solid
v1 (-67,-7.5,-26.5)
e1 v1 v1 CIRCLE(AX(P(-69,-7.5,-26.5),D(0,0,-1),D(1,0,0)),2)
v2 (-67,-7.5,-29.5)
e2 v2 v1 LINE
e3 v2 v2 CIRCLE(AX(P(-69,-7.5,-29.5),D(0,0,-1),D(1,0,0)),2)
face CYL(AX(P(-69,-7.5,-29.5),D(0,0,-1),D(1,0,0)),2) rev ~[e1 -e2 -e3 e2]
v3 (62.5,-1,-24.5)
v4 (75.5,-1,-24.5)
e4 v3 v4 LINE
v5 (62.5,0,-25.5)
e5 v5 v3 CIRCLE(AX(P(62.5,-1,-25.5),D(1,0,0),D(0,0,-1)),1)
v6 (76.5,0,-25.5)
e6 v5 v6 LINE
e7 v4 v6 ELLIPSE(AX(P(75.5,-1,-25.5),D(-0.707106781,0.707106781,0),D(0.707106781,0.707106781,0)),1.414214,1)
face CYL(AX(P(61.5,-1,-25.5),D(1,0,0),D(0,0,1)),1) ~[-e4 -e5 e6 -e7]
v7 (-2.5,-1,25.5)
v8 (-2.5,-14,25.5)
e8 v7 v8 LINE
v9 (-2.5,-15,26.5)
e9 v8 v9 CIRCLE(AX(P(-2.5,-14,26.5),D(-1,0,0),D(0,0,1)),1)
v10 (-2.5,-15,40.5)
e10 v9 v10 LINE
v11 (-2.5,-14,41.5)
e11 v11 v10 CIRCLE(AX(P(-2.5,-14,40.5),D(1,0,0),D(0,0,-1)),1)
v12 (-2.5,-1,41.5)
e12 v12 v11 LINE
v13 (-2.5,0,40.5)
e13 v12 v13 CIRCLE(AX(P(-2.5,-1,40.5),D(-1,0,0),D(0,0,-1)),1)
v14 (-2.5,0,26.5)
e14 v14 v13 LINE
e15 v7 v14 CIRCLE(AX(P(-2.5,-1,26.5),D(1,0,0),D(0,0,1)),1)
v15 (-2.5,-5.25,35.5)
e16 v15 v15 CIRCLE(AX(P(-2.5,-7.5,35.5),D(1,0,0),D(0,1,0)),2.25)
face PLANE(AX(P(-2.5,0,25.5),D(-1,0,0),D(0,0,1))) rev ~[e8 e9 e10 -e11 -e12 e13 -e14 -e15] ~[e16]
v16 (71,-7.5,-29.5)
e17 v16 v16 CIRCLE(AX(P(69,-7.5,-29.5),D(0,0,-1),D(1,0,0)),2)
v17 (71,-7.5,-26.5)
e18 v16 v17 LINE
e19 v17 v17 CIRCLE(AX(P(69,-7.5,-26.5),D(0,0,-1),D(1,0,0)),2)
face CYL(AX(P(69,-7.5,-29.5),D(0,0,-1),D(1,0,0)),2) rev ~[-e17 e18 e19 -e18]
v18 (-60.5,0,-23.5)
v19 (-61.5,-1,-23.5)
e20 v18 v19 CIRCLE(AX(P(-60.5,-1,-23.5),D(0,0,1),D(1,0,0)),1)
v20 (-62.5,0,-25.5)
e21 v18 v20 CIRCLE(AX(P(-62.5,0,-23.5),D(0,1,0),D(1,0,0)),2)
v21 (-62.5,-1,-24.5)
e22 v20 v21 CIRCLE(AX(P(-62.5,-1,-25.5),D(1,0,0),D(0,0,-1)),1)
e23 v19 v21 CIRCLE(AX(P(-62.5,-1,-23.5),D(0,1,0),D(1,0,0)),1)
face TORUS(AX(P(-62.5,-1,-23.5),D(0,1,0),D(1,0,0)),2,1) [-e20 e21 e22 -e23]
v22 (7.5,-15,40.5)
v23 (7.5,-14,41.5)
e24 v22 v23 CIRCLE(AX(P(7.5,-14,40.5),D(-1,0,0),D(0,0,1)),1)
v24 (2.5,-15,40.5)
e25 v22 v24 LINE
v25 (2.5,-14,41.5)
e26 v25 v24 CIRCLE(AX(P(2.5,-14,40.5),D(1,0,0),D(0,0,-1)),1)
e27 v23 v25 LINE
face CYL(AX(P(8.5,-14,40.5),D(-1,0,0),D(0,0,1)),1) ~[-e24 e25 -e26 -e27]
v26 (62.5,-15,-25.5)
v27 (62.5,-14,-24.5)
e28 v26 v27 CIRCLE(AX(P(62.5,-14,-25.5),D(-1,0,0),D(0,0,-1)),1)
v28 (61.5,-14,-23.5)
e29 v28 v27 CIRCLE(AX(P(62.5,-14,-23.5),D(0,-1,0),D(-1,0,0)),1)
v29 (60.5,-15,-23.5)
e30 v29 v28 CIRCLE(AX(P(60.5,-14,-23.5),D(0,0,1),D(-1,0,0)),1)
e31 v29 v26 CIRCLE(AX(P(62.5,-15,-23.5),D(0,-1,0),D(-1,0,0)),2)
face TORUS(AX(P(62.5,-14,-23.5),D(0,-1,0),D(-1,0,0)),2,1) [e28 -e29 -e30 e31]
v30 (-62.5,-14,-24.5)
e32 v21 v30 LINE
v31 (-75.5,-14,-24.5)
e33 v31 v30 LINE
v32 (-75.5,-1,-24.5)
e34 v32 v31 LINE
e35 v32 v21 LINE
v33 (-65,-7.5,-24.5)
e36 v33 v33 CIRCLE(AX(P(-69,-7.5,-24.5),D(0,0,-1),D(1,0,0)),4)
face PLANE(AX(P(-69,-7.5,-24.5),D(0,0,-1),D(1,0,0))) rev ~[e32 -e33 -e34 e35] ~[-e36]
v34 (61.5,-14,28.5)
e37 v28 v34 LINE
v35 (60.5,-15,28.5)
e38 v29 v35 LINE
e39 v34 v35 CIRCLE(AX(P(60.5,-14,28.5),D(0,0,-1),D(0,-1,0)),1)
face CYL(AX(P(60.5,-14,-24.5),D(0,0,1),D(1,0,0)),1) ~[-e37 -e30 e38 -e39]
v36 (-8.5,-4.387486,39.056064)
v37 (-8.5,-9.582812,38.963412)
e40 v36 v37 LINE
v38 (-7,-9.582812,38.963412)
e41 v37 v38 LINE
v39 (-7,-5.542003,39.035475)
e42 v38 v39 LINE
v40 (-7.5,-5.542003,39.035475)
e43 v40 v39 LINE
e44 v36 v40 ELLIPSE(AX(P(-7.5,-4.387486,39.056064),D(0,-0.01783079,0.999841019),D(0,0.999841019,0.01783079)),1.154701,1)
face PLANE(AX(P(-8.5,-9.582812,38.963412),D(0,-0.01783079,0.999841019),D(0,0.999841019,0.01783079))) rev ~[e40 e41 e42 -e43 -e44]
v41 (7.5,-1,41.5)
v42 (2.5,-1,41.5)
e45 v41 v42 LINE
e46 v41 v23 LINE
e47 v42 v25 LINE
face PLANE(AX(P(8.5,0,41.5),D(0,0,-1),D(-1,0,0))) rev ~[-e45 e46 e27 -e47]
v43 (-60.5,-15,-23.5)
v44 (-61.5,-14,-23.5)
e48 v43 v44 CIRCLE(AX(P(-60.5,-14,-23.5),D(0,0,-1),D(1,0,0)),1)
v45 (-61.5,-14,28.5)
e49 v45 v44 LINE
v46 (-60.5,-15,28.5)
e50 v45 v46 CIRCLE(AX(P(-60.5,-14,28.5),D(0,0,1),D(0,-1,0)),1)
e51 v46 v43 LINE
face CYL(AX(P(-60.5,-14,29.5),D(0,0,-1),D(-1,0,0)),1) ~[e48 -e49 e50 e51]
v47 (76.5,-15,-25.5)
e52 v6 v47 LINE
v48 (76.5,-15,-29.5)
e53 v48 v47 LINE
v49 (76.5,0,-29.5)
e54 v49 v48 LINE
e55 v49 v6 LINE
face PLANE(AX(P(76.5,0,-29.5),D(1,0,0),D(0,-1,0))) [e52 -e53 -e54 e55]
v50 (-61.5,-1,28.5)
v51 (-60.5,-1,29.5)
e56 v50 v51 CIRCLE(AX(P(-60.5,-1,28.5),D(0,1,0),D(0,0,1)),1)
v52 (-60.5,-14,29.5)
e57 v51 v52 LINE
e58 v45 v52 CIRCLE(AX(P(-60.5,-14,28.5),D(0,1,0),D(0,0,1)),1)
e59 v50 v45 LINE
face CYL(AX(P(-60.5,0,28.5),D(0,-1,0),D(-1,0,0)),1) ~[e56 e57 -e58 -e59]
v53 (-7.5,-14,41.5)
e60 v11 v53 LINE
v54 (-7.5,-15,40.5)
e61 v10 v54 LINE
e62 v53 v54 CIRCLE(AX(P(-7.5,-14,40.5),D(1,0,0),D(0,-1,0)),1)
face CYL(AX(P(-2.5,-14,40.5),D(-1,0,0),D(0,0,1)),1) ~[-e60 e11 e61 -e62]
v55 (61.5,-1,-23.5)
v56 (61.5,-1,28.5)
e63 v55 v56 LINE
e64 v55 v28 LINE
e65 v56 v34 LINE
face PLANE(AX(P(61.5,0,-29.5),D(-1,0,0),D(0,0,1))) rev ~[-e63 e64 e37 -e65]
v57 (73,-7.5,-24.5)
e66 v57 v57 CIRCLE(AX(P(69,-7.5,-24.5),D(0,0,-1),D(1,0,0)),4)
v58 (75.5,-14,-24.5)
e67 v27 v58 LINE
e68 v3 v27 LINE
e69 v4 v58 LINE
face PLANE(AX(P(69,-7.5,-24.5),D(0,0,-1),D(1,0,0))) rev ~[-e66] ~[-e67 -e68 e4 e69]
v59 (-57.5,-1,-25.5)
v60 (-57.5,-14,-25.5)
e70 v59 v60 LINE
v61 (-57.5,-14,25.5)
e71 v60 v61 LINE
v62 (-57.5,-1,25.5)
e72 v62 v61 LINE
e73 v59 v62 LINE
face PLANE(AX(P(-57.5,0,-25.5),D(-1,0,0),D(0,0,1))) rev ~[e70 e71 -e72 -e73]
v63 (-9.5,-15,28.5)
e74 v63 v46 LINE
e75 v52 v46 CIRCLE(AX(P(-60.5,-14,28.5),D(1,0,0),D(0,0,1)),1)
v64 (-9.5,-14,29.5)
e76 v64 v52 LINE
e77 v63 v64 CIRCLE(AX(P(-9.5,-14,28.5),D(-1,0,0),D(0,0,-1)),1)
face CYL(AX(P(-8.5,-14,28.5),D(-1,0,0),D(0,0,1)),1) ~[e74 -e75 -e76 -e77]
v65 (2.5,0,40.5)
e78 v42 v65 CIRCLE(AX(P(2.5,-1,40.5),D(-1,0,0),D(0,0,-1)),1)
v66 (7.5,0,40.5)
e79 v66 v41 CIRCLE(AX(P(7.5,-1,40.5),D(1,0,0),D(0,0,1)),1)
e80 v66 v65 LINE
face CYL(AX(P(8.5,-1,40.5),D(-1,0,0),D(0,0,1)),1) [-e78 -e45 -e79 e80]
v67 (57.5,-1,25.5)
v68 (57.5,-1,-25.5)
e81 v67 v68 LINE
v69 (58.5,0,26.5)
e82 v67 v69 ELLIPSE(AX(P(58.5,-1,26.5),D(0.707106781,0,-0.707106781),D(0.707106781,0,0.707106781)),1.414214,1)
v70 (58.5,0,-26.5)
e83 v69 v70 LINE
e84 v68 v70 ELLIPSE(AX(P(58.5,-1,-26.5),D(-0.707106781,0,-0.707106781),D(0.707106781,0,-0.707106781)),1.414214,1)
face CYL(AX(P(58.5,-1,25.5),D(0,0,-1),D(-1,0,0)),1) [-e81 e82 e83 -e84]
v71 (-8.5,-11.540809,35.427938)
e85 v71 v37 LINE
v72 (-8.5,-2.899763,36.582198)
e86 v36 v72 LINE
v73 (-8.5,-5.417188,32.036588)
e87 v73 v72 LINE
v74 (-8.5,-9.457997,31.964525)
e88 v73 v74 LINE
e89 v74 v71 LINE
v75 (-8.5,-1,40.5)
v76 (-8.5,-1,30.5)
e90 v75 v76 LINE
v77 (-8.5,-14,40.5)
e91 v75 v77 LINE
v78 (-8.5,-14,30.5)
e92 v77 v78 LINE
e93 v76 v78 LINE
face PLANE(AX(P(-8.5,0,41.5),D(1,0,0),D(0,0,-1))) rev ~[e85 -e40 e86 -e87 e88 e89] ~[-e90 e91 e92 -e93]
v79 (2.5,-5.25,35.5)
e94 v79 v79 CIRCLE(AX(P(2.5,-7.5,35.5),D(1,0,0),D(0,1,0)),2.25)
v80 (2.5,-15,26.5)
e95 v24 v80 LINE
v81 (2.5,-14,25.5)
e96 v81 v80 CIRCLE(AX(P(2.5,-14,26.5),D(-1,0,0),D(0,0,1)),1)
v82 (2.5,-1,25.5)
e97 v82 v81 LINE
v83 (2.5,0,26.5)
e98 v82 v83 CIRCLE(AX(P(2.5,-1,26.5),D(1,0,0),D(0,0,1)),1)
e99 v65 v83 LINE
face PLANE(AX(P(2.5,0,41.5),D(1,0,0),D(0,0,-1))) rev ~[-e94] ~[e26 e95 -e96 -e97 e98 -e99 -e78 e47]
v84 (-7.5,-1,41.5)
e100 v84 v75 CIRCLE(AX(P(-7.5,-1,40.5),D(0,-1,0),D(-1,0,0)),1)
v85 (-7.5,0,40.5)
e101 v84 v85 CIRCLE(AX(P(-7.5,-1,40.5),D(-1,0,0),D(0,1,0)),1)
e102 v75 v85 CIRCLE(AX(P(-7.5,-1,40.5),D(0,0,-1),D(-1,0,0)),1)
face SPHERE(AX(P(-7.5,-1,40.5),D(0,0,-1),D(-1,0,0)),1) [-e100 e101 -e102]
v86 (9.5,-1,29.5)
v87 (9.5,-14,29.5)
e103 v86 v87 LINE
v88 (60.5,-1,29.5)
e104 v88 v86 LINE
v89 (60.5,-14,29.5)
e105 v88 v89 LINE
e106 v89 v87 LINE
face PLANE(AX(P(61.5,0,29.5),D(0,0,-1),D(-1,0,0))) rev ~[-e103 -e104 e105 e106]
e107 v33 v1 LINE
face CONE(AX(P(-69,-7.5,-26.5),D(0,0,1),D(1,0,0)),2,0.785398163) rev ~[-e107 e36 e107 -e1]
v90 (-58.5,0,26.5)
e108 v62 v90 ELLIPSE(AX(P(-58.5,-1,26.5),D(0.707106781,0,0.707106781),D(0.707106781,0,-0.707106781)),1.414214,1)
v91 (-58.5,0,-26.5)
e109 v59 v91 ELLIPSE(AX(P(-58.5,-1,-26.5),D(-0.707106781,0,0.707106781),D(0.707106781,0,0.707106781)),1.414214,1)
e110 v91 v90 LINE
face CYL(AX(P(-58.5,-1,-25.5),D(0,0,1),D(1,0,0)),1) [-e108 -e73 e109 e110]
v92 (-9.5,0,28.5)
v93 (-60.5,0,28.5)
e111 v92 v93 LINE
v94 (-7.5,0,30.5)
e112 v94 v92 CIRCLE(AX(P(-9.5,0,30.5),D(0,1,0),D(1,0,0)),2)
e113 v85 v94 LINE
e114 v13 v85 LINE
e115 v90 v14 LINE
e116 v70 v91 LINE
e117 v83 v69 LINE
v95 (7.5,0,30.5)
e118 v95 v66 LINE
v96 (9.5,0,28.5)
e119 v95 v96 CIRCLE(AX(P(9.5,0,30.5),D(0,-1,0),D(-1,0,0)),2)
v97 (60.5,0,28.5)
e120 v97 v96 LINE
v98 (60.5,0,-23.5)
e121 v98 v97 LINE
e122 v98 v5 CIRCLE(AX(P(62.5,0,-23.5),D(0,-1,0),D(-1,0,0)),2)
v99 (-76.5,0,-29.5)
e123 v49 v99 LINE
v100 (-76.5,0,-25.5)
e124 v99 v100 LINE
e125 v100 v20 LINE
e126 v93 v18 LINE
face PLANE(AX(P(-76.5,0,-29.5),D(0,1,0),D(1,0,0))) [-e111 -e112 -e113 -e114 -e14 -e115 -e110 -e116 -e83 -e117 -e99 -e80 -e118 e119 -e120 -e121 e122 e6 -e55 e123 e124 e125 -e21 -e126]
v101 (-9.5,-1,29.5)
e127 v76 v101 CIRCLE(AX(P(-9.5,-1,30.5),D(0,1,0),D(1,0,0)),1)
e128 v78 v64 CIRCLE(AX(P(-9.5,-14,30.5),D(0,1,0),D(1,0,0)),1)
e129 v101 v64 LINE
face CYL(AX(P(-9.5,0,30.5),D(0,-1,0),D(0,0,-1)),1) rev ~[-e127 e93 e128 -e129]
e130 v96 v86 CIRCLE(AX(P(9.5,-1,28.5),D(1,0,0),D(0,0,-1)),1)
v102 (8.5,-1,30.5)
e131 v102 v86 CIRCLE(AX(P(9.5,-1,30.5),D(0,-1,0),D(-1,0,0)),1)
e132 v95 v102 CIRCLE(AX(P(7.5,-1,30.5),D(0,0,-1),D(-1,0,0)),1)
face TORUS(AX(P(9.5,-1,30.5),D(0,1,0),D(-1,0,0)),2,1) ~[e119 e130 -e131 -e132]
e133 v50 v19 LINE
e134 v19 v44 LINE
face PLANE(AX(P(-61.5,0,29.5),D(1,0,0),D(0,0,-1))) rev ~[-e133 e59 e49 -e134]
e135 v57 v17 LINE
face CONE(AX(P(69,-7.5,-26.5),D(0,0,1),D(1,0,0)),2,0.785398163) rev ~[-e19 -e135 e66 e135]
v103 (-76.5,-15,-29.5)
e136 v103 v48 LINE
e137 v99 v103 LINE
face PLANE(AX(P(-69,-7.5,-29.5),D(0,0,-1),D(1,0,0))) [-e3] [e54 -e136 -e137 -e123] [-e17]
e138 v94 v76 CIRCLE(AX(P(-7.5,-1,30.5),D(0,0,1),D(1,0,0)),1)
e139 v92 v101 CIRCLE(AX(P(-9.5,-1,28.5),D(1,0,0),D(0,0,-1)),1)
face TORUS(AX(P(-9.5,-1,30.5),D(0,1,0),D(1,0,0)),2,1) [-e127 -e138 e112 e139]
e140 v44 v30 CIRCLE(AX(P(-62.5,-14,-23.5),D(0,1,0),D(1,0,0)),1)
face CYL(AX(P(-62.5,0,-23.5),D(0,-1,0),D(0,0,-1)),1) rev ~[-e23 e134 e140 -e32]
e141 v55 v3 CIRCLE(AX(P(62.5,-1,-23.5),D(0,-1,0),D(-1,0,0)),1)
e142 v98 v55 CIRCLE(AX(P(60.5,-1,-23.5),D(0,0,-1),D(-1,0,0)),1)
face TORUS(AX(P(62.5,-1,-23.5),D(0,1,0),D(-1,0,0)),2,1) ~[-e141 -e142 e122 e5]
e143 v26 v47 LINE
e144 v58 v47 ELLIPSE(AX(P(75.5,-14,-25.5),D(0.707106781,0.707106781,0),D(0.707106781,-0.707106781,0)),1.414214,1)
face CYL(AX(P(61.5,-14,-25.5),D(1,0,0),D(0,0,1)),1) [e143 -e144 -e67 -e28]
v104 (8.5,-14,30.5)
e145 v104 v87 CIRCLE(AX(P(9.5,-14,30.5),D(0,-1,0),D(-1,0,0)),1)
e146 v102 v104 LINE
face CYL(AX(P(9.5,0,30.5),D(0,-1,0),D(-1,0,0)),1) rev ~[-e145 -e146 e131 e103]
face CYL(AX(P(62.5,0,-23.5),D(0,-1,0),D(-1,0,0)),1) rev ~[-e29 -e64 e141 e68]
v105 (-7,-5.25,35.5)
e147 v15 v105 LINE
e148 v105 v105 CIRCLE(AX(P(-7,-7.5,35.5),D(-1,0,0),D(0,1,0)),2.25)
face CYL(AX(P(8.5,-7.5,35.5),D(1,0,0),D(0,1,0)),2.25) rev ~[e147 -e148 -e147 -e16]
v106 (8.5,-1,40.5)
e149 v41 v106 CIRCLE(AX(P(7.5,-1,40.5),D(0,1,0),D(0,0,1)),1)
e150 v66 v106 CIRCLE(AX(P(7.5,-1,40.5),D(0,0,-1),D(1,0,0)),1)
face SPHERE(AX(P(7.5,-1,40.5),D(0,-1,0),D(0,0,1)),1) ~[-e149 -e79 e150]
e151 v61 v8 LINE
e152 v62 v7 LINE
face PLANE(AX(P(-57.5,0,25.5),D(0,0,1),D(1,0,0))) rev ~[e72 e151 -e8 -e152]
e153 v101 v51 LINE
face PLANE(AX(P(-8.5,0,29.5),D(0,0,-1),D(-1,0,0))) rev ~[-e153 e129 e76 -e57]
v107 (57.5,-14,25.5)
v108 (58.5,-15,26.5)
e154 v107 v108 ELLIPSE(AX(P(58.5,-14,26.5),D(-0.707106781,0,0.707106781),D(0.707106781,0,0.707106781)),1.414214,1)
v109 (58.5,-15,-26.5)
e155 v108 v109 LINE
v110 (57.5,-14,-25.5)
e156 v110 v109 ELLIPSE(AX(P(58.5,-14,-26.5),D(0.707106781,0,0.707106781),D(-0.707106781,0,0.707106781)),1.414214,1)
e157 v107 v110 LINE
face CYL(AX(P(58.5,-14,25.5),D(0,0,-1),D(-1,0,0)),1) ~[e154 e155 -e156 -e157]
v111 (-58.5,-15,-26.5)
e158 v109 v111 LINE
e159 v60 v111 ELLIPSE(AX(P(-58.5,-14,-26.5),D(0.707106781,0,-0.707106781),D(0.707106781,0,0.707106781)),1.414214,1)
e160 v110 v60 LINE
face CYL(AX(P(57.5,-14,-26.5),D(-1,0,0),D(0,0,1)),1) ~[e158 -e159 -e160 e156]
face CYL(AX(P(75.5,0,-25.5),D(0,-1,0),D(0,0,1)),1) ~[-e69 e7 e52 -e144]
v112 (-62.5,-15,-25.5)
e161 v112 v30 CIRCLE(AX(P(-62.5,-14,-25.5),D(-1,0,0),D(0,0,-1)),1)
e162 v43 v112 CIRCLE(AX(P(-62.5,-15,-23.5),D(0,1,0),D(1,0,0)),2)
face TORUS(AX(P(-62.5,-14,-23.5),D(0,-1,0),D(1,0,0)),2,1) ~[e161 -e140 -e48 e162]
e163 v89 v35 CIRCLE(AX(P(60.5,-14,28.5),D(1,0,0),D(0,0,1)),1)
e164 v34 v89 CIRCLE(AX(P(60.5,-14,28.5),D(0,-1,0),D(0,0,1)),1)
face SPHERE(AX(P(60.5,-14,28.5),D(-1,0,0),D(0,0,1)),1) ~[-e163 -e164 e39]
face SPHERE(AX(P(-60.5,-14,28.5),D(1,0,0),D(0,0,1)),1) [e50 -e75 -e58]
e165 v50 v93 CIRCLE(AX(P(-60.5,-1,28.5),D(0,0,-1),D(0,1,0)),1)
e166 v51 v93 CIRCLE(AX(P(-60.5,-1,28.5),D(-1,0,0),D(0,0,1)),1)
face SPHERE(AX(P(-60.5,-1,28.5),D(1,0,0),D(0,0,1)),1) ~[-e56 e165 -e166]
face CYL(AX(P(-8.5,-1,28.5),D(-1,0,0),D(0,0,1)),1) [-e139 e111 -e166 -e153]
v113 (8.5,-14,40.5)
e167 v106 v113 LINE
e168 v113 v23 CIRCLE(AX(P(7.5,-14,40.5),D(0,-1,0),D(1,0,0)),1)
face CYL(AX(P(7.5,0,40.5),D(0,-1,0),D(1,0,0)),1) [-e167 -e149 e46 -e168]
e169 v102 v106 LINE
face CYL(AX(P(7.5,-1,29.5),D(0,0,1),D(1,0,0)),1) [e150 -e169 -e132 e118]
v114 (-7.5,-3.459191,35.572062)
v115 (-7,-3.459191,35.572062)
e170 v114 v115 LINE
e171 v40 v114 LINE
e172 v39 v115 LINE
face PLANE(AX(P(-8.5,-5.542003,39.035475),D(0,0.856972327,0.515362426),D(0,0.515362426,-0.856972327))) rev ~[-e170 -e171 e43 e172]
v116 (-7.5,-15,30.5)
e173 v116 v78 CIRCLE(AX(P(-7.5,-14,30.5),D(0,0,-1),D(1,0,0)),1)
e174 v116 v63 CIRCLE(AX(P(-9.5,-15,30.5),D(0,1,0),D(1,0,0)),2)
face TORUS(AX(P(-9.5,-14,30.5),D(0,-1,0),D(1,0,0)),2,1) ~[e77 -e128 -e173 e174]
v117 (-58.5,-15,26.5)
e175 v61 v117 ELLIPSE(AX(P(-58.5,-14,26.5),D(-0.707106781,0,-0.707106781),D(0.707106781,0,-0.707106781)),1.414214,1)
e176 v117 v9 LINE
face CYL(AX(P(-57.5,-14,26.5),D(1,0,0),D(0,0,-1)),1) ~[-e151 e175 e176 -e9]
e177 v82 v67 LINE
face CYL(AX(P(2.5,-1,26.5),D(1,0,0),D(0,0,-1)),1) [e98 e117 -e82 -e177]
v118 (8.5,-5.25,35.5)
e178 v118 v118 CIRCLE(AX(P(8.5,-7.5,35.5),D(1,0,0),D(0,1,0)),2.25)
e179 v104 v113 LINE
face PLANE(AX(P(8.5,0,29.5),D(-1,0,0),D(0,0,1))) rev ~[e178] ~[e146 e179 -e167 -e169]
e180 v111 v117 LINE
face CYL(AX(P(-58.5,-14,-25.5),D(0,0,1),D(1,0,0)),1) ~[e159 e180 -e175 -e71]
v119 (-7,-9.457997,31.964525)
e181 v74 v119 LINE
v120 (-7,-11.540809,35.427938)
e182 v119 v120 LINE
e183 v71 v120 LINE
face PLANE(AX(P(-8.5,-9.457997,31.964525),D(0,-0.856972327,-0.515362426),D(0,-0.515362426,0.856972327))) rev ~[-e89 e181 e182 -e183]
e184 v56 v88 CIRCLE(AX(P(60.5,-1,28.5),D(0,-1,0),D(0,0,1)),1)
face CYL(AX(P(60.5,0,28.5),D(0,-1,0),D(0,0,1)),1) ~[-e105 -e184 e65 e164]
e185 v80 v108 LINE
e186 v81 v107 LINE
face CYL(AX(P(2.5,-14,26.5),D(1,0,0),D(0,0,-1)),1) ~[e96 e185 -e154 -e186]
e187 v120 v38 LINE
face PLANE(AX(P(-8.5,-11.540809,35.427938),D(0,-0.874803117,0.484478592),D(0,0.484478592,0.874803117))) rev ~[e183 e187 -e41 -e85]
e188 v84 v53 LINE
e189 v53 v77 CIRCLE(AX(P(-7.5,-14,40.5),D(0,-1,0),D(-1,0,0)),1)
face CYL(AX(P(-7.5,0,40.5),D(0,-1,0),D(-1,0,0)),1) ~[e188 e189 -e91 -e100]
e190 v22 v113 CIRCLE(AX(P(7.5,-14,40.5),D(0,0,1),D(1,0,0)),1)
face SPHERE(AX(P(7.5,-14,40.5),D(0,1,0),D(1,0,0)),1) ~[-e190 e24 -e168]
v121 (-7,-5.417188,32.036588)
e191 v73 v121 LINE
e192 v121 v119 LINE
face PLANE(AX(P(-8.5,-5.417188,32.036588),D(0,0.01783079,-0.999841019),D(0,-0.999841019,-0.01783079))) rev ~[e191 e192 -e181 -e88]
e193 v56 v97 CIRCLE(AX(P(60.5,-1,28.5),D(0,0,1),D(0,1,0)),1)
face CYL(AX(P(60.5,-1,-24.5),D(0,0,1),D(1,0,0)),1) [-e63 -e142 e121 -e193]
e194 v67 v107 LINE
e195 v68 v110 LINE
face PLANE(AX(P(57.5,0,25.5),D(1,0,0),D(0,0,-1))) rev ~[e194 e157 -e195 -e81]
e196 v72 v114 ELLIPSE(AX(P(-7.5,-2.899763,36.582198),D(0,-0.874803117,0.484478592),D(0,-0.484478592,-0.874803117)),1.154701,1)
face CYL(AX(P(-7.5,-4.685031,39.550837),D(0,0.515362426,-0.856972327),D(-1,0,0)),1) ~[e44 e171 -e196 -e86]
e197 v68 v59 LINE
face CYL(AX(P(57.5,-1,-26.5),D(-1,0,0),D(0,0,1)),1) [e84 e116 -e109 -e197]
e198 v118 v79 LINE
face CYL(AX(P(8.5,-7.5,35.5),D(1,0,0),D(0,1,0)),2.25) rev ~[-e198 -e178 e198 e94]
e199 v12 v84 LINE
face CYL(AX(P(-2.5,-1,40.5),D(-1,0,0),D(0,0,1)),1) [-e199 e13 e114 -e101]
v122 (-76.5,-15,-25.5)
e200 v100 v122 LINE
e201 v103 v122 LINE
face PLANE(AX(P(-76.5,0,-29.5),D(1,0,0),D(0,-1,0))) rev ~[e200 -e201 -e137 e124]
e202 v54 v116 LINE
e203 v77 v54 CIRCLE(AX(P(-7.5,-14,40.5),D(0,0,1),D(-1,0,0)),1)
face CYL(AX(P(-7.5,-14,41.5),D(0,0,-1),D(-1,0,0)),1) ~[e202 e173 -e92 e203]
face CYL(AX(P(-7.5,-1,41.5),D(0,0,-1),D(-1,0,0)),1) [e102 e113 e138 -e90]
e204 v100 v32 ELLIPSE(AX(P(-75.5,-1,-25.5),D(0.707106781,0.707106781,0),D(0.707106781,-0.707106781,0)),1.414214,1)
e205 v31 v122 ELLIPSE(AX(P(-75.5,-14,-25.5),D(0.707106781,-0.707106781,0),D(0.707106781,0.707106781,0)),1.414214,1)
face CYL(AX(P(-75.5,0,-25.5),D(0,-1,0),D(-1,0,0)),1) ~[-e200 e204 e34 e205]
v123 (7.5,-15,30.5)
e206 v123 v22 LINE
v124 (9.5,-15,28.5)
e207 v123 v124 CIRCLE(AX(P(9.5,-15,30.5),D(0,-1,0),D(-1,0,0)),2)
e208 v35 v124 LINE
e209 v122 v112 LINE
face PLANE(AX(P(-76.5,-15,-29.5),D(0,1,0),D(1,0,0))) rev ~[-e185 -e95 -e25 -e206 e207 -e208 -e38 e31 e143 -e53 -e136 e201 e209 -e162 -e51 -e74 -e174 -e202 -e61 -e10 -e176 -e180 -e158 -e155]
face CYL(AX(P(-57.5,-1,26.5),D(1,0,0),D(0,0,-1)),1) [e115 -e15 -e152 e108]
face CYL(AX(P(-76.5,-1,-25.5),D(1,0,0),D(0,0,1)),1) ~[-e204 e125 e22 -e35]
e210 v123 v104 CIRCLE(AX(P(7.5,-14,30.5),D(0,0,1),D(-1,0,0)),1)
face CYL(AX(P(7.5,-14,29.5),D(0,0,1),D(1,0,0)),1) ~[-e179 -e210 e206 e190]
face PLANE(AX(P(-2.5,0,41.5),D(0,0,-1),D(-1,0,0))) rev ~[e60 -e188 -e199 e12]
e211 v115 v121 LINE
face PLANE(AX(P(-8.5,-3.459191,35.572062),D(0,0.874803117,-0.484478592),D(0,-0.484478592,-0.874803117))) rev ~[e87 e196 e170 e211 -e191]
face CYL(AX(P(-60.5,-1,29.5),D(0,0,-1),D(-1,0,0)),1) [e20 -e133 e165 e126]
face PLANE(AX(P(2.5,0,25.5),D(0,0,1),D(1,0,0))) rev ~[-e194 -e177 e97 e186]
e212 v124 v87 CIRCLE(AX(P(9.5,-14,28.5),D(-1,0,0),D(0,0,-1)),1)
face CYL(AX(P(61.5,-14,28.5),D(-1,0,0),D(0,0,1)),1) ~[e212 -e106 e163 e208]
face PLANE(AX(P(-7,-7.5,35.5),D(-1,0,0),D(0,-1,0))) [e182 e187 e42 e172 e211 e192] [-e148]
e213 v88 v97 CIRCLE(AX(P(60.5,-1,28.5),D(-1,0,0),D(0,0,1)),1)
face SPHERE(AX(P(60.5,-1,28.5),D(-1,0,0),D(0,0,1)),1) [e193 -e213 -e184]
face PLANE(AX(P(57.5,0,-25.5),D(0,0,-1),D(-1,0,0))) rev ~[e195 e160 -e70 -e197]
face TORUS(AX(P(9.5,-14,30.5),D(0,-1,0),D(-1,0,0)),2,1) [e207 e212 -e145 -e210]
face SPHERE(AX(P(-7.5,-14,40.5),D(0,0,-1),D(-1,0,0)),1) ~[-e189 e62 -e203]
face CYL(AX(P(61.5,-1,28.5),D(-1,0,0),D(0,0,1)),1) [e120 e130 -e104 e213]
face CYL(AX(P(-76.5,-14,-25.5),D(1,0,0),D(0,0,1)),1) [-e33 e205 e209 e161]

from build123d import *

# Parameters (mm, degrees)
F1_DEPTH = 15
F2_R     = 2.25
F3_DEPTH = 25
F5_R     = 2.25
F6_DEPTH = 1.5
F7_W     = 15
F7_H     = 15
F7_R     = 2
F8_DEPTH = 5
F9_R     = 1
F10_SIZE = 2


with BuildPart() as f1:
    # F0 (on Front) → F1 (new body)
    with BuildSketch(Plane.XZ):
        Polygon((-57.5, -25.5), (-57.5, 25.5), (-8.5, 25.5), (-2.5, 25.5), (-2.5, 41.5), (-8.5, 41.5), (-8.5, 29.5), (-61.5, 29.5), (-61.5, -29.5), (61.5, -29.5), (61.5, 29.5), (8.5, 29.5), (8.5, 41.5), (2.5, 41.5), (2.5, 25.5), (8.5, 25.5), (57.5, 25.5), (57.5, -25.5), align=None)
    extrude(amount=F1_DEPTH)

    # F2 (on face) → F3 (cut)
    with BuildSketch(Plane.YZ.offset(8.5)):
        with Locations((-7.5, 35.5)):
            Circle(F2_R)
    extrude(amount=-F3_DEPTH, mode=Mode.SUBTRACT)

    # F5 (on face) → F6 (cut)
    with BuildSketch(Plane(origin=(-8.5, 0, 0), x_dir=(0, -1, 0), z_dir=(-1, 0, 0))):
        Polygon((9.45799692, 31.9645252943), (11.5408093696, 35.4279377204), (9.5828124496, 38.9634124261), (5.54200308, 39.0354747057), (3.4591906304, 35.5720622796), (5.4171875504, 32.0365875739), align=None)
        with Locations((7.5, 35.5)):
            Circle(F5_R, mode=Mode.SUBTRACT)
    extrude(amount=-F6_DEPTH, mode=Mode.SUBTRACT)

    # F7 (on face) → F8 (join)
    with BuildSketch(Plane(origin=(0, 0, -29.5), x_dir=(1, 0, 0), z_dir=(0, 0, -1))):
        with Locations((-69, 7.5)):
            Rectangle(F7_W, F7_H)
        with Locations((-69, 7.5)):
            Circle(F7_R, mode=Mode.SUBTRACT)
        with Locations((69, 7.5)):
            Rectangle(F7_W, F7_H)
        with Locations((69, 7.5)):
            Circle(F7_R, mode=Mode.SUBTRACT)
    extrude(amount=-F8_DEPTH)

    # F9
    f9_edges = [f1.edges().sort_by_distance(p)[0] for p in [
        (30, 0, 25.5),
        (57.5, 0, 0),
        (-30, 0, 25.5),
        (-57.5, 0, 0),
        (0, 0, -25.5),
        (-30, -15, 25.5),
        (30, -15, 25.5),
        (-57.5, -15, 0),
        (0, -15, -25.5),
        (57.5, -15, 0),
        (-69, -15, -24.5),
        (-76.5, -7.5, -24.5),
        (-69, 0, -24.5),
        (69, 0, -24.5),
        (76.5, -7.5, -24.5),
        (69, -15, -24.5),
        (61.5, -7.5, -24.5),
        (-61.5, -7.5, -24.5),
        (-35, -15, 29.5),
        (-35, 0, 29.5),
        (35, 0, 29.5),
        (8.5, -7.5, 29.5),
        (-8.5, -7.5, 29.5),
        (-8.5, -4.500597, 37.303768),
        (-8.5, -15, 35.5),
        (-8.5, 0, 35.5),
        (-8.5, -7.5, 41.5),
        (8.5, -7.5, 41.5),
        (8.5, -15, 35.5),
        (35, -15, 29.5),
        (61.5, -7.5, 29.5),
        (-61.5, -7.5, 29.5),
        (5.5, 0, 41.5),
        (-5.5, 0, 41.5),
        (-5.5, -15, 41.5),
        (5.5, -15, 41.5),
        (-61.5, -15, 2.5),
        (61.5, -15, 2.5),
        (8.5, 0, 35.5),
        (61.5, 0, 2.5),
        (-61.5, 0, 2.5),
    ]]
    fillet(f9_edges, radius=F9_R)

    # F10
    f10_edges = [f1.edges().sort_by_distance(p)[0] for p in [
        (67, -7.5, -24.5),
        (-71, -7.5, -24.5),
    ]]
    chamfer(f10_edges, length=F10_SIZE)


solid = f1.part
